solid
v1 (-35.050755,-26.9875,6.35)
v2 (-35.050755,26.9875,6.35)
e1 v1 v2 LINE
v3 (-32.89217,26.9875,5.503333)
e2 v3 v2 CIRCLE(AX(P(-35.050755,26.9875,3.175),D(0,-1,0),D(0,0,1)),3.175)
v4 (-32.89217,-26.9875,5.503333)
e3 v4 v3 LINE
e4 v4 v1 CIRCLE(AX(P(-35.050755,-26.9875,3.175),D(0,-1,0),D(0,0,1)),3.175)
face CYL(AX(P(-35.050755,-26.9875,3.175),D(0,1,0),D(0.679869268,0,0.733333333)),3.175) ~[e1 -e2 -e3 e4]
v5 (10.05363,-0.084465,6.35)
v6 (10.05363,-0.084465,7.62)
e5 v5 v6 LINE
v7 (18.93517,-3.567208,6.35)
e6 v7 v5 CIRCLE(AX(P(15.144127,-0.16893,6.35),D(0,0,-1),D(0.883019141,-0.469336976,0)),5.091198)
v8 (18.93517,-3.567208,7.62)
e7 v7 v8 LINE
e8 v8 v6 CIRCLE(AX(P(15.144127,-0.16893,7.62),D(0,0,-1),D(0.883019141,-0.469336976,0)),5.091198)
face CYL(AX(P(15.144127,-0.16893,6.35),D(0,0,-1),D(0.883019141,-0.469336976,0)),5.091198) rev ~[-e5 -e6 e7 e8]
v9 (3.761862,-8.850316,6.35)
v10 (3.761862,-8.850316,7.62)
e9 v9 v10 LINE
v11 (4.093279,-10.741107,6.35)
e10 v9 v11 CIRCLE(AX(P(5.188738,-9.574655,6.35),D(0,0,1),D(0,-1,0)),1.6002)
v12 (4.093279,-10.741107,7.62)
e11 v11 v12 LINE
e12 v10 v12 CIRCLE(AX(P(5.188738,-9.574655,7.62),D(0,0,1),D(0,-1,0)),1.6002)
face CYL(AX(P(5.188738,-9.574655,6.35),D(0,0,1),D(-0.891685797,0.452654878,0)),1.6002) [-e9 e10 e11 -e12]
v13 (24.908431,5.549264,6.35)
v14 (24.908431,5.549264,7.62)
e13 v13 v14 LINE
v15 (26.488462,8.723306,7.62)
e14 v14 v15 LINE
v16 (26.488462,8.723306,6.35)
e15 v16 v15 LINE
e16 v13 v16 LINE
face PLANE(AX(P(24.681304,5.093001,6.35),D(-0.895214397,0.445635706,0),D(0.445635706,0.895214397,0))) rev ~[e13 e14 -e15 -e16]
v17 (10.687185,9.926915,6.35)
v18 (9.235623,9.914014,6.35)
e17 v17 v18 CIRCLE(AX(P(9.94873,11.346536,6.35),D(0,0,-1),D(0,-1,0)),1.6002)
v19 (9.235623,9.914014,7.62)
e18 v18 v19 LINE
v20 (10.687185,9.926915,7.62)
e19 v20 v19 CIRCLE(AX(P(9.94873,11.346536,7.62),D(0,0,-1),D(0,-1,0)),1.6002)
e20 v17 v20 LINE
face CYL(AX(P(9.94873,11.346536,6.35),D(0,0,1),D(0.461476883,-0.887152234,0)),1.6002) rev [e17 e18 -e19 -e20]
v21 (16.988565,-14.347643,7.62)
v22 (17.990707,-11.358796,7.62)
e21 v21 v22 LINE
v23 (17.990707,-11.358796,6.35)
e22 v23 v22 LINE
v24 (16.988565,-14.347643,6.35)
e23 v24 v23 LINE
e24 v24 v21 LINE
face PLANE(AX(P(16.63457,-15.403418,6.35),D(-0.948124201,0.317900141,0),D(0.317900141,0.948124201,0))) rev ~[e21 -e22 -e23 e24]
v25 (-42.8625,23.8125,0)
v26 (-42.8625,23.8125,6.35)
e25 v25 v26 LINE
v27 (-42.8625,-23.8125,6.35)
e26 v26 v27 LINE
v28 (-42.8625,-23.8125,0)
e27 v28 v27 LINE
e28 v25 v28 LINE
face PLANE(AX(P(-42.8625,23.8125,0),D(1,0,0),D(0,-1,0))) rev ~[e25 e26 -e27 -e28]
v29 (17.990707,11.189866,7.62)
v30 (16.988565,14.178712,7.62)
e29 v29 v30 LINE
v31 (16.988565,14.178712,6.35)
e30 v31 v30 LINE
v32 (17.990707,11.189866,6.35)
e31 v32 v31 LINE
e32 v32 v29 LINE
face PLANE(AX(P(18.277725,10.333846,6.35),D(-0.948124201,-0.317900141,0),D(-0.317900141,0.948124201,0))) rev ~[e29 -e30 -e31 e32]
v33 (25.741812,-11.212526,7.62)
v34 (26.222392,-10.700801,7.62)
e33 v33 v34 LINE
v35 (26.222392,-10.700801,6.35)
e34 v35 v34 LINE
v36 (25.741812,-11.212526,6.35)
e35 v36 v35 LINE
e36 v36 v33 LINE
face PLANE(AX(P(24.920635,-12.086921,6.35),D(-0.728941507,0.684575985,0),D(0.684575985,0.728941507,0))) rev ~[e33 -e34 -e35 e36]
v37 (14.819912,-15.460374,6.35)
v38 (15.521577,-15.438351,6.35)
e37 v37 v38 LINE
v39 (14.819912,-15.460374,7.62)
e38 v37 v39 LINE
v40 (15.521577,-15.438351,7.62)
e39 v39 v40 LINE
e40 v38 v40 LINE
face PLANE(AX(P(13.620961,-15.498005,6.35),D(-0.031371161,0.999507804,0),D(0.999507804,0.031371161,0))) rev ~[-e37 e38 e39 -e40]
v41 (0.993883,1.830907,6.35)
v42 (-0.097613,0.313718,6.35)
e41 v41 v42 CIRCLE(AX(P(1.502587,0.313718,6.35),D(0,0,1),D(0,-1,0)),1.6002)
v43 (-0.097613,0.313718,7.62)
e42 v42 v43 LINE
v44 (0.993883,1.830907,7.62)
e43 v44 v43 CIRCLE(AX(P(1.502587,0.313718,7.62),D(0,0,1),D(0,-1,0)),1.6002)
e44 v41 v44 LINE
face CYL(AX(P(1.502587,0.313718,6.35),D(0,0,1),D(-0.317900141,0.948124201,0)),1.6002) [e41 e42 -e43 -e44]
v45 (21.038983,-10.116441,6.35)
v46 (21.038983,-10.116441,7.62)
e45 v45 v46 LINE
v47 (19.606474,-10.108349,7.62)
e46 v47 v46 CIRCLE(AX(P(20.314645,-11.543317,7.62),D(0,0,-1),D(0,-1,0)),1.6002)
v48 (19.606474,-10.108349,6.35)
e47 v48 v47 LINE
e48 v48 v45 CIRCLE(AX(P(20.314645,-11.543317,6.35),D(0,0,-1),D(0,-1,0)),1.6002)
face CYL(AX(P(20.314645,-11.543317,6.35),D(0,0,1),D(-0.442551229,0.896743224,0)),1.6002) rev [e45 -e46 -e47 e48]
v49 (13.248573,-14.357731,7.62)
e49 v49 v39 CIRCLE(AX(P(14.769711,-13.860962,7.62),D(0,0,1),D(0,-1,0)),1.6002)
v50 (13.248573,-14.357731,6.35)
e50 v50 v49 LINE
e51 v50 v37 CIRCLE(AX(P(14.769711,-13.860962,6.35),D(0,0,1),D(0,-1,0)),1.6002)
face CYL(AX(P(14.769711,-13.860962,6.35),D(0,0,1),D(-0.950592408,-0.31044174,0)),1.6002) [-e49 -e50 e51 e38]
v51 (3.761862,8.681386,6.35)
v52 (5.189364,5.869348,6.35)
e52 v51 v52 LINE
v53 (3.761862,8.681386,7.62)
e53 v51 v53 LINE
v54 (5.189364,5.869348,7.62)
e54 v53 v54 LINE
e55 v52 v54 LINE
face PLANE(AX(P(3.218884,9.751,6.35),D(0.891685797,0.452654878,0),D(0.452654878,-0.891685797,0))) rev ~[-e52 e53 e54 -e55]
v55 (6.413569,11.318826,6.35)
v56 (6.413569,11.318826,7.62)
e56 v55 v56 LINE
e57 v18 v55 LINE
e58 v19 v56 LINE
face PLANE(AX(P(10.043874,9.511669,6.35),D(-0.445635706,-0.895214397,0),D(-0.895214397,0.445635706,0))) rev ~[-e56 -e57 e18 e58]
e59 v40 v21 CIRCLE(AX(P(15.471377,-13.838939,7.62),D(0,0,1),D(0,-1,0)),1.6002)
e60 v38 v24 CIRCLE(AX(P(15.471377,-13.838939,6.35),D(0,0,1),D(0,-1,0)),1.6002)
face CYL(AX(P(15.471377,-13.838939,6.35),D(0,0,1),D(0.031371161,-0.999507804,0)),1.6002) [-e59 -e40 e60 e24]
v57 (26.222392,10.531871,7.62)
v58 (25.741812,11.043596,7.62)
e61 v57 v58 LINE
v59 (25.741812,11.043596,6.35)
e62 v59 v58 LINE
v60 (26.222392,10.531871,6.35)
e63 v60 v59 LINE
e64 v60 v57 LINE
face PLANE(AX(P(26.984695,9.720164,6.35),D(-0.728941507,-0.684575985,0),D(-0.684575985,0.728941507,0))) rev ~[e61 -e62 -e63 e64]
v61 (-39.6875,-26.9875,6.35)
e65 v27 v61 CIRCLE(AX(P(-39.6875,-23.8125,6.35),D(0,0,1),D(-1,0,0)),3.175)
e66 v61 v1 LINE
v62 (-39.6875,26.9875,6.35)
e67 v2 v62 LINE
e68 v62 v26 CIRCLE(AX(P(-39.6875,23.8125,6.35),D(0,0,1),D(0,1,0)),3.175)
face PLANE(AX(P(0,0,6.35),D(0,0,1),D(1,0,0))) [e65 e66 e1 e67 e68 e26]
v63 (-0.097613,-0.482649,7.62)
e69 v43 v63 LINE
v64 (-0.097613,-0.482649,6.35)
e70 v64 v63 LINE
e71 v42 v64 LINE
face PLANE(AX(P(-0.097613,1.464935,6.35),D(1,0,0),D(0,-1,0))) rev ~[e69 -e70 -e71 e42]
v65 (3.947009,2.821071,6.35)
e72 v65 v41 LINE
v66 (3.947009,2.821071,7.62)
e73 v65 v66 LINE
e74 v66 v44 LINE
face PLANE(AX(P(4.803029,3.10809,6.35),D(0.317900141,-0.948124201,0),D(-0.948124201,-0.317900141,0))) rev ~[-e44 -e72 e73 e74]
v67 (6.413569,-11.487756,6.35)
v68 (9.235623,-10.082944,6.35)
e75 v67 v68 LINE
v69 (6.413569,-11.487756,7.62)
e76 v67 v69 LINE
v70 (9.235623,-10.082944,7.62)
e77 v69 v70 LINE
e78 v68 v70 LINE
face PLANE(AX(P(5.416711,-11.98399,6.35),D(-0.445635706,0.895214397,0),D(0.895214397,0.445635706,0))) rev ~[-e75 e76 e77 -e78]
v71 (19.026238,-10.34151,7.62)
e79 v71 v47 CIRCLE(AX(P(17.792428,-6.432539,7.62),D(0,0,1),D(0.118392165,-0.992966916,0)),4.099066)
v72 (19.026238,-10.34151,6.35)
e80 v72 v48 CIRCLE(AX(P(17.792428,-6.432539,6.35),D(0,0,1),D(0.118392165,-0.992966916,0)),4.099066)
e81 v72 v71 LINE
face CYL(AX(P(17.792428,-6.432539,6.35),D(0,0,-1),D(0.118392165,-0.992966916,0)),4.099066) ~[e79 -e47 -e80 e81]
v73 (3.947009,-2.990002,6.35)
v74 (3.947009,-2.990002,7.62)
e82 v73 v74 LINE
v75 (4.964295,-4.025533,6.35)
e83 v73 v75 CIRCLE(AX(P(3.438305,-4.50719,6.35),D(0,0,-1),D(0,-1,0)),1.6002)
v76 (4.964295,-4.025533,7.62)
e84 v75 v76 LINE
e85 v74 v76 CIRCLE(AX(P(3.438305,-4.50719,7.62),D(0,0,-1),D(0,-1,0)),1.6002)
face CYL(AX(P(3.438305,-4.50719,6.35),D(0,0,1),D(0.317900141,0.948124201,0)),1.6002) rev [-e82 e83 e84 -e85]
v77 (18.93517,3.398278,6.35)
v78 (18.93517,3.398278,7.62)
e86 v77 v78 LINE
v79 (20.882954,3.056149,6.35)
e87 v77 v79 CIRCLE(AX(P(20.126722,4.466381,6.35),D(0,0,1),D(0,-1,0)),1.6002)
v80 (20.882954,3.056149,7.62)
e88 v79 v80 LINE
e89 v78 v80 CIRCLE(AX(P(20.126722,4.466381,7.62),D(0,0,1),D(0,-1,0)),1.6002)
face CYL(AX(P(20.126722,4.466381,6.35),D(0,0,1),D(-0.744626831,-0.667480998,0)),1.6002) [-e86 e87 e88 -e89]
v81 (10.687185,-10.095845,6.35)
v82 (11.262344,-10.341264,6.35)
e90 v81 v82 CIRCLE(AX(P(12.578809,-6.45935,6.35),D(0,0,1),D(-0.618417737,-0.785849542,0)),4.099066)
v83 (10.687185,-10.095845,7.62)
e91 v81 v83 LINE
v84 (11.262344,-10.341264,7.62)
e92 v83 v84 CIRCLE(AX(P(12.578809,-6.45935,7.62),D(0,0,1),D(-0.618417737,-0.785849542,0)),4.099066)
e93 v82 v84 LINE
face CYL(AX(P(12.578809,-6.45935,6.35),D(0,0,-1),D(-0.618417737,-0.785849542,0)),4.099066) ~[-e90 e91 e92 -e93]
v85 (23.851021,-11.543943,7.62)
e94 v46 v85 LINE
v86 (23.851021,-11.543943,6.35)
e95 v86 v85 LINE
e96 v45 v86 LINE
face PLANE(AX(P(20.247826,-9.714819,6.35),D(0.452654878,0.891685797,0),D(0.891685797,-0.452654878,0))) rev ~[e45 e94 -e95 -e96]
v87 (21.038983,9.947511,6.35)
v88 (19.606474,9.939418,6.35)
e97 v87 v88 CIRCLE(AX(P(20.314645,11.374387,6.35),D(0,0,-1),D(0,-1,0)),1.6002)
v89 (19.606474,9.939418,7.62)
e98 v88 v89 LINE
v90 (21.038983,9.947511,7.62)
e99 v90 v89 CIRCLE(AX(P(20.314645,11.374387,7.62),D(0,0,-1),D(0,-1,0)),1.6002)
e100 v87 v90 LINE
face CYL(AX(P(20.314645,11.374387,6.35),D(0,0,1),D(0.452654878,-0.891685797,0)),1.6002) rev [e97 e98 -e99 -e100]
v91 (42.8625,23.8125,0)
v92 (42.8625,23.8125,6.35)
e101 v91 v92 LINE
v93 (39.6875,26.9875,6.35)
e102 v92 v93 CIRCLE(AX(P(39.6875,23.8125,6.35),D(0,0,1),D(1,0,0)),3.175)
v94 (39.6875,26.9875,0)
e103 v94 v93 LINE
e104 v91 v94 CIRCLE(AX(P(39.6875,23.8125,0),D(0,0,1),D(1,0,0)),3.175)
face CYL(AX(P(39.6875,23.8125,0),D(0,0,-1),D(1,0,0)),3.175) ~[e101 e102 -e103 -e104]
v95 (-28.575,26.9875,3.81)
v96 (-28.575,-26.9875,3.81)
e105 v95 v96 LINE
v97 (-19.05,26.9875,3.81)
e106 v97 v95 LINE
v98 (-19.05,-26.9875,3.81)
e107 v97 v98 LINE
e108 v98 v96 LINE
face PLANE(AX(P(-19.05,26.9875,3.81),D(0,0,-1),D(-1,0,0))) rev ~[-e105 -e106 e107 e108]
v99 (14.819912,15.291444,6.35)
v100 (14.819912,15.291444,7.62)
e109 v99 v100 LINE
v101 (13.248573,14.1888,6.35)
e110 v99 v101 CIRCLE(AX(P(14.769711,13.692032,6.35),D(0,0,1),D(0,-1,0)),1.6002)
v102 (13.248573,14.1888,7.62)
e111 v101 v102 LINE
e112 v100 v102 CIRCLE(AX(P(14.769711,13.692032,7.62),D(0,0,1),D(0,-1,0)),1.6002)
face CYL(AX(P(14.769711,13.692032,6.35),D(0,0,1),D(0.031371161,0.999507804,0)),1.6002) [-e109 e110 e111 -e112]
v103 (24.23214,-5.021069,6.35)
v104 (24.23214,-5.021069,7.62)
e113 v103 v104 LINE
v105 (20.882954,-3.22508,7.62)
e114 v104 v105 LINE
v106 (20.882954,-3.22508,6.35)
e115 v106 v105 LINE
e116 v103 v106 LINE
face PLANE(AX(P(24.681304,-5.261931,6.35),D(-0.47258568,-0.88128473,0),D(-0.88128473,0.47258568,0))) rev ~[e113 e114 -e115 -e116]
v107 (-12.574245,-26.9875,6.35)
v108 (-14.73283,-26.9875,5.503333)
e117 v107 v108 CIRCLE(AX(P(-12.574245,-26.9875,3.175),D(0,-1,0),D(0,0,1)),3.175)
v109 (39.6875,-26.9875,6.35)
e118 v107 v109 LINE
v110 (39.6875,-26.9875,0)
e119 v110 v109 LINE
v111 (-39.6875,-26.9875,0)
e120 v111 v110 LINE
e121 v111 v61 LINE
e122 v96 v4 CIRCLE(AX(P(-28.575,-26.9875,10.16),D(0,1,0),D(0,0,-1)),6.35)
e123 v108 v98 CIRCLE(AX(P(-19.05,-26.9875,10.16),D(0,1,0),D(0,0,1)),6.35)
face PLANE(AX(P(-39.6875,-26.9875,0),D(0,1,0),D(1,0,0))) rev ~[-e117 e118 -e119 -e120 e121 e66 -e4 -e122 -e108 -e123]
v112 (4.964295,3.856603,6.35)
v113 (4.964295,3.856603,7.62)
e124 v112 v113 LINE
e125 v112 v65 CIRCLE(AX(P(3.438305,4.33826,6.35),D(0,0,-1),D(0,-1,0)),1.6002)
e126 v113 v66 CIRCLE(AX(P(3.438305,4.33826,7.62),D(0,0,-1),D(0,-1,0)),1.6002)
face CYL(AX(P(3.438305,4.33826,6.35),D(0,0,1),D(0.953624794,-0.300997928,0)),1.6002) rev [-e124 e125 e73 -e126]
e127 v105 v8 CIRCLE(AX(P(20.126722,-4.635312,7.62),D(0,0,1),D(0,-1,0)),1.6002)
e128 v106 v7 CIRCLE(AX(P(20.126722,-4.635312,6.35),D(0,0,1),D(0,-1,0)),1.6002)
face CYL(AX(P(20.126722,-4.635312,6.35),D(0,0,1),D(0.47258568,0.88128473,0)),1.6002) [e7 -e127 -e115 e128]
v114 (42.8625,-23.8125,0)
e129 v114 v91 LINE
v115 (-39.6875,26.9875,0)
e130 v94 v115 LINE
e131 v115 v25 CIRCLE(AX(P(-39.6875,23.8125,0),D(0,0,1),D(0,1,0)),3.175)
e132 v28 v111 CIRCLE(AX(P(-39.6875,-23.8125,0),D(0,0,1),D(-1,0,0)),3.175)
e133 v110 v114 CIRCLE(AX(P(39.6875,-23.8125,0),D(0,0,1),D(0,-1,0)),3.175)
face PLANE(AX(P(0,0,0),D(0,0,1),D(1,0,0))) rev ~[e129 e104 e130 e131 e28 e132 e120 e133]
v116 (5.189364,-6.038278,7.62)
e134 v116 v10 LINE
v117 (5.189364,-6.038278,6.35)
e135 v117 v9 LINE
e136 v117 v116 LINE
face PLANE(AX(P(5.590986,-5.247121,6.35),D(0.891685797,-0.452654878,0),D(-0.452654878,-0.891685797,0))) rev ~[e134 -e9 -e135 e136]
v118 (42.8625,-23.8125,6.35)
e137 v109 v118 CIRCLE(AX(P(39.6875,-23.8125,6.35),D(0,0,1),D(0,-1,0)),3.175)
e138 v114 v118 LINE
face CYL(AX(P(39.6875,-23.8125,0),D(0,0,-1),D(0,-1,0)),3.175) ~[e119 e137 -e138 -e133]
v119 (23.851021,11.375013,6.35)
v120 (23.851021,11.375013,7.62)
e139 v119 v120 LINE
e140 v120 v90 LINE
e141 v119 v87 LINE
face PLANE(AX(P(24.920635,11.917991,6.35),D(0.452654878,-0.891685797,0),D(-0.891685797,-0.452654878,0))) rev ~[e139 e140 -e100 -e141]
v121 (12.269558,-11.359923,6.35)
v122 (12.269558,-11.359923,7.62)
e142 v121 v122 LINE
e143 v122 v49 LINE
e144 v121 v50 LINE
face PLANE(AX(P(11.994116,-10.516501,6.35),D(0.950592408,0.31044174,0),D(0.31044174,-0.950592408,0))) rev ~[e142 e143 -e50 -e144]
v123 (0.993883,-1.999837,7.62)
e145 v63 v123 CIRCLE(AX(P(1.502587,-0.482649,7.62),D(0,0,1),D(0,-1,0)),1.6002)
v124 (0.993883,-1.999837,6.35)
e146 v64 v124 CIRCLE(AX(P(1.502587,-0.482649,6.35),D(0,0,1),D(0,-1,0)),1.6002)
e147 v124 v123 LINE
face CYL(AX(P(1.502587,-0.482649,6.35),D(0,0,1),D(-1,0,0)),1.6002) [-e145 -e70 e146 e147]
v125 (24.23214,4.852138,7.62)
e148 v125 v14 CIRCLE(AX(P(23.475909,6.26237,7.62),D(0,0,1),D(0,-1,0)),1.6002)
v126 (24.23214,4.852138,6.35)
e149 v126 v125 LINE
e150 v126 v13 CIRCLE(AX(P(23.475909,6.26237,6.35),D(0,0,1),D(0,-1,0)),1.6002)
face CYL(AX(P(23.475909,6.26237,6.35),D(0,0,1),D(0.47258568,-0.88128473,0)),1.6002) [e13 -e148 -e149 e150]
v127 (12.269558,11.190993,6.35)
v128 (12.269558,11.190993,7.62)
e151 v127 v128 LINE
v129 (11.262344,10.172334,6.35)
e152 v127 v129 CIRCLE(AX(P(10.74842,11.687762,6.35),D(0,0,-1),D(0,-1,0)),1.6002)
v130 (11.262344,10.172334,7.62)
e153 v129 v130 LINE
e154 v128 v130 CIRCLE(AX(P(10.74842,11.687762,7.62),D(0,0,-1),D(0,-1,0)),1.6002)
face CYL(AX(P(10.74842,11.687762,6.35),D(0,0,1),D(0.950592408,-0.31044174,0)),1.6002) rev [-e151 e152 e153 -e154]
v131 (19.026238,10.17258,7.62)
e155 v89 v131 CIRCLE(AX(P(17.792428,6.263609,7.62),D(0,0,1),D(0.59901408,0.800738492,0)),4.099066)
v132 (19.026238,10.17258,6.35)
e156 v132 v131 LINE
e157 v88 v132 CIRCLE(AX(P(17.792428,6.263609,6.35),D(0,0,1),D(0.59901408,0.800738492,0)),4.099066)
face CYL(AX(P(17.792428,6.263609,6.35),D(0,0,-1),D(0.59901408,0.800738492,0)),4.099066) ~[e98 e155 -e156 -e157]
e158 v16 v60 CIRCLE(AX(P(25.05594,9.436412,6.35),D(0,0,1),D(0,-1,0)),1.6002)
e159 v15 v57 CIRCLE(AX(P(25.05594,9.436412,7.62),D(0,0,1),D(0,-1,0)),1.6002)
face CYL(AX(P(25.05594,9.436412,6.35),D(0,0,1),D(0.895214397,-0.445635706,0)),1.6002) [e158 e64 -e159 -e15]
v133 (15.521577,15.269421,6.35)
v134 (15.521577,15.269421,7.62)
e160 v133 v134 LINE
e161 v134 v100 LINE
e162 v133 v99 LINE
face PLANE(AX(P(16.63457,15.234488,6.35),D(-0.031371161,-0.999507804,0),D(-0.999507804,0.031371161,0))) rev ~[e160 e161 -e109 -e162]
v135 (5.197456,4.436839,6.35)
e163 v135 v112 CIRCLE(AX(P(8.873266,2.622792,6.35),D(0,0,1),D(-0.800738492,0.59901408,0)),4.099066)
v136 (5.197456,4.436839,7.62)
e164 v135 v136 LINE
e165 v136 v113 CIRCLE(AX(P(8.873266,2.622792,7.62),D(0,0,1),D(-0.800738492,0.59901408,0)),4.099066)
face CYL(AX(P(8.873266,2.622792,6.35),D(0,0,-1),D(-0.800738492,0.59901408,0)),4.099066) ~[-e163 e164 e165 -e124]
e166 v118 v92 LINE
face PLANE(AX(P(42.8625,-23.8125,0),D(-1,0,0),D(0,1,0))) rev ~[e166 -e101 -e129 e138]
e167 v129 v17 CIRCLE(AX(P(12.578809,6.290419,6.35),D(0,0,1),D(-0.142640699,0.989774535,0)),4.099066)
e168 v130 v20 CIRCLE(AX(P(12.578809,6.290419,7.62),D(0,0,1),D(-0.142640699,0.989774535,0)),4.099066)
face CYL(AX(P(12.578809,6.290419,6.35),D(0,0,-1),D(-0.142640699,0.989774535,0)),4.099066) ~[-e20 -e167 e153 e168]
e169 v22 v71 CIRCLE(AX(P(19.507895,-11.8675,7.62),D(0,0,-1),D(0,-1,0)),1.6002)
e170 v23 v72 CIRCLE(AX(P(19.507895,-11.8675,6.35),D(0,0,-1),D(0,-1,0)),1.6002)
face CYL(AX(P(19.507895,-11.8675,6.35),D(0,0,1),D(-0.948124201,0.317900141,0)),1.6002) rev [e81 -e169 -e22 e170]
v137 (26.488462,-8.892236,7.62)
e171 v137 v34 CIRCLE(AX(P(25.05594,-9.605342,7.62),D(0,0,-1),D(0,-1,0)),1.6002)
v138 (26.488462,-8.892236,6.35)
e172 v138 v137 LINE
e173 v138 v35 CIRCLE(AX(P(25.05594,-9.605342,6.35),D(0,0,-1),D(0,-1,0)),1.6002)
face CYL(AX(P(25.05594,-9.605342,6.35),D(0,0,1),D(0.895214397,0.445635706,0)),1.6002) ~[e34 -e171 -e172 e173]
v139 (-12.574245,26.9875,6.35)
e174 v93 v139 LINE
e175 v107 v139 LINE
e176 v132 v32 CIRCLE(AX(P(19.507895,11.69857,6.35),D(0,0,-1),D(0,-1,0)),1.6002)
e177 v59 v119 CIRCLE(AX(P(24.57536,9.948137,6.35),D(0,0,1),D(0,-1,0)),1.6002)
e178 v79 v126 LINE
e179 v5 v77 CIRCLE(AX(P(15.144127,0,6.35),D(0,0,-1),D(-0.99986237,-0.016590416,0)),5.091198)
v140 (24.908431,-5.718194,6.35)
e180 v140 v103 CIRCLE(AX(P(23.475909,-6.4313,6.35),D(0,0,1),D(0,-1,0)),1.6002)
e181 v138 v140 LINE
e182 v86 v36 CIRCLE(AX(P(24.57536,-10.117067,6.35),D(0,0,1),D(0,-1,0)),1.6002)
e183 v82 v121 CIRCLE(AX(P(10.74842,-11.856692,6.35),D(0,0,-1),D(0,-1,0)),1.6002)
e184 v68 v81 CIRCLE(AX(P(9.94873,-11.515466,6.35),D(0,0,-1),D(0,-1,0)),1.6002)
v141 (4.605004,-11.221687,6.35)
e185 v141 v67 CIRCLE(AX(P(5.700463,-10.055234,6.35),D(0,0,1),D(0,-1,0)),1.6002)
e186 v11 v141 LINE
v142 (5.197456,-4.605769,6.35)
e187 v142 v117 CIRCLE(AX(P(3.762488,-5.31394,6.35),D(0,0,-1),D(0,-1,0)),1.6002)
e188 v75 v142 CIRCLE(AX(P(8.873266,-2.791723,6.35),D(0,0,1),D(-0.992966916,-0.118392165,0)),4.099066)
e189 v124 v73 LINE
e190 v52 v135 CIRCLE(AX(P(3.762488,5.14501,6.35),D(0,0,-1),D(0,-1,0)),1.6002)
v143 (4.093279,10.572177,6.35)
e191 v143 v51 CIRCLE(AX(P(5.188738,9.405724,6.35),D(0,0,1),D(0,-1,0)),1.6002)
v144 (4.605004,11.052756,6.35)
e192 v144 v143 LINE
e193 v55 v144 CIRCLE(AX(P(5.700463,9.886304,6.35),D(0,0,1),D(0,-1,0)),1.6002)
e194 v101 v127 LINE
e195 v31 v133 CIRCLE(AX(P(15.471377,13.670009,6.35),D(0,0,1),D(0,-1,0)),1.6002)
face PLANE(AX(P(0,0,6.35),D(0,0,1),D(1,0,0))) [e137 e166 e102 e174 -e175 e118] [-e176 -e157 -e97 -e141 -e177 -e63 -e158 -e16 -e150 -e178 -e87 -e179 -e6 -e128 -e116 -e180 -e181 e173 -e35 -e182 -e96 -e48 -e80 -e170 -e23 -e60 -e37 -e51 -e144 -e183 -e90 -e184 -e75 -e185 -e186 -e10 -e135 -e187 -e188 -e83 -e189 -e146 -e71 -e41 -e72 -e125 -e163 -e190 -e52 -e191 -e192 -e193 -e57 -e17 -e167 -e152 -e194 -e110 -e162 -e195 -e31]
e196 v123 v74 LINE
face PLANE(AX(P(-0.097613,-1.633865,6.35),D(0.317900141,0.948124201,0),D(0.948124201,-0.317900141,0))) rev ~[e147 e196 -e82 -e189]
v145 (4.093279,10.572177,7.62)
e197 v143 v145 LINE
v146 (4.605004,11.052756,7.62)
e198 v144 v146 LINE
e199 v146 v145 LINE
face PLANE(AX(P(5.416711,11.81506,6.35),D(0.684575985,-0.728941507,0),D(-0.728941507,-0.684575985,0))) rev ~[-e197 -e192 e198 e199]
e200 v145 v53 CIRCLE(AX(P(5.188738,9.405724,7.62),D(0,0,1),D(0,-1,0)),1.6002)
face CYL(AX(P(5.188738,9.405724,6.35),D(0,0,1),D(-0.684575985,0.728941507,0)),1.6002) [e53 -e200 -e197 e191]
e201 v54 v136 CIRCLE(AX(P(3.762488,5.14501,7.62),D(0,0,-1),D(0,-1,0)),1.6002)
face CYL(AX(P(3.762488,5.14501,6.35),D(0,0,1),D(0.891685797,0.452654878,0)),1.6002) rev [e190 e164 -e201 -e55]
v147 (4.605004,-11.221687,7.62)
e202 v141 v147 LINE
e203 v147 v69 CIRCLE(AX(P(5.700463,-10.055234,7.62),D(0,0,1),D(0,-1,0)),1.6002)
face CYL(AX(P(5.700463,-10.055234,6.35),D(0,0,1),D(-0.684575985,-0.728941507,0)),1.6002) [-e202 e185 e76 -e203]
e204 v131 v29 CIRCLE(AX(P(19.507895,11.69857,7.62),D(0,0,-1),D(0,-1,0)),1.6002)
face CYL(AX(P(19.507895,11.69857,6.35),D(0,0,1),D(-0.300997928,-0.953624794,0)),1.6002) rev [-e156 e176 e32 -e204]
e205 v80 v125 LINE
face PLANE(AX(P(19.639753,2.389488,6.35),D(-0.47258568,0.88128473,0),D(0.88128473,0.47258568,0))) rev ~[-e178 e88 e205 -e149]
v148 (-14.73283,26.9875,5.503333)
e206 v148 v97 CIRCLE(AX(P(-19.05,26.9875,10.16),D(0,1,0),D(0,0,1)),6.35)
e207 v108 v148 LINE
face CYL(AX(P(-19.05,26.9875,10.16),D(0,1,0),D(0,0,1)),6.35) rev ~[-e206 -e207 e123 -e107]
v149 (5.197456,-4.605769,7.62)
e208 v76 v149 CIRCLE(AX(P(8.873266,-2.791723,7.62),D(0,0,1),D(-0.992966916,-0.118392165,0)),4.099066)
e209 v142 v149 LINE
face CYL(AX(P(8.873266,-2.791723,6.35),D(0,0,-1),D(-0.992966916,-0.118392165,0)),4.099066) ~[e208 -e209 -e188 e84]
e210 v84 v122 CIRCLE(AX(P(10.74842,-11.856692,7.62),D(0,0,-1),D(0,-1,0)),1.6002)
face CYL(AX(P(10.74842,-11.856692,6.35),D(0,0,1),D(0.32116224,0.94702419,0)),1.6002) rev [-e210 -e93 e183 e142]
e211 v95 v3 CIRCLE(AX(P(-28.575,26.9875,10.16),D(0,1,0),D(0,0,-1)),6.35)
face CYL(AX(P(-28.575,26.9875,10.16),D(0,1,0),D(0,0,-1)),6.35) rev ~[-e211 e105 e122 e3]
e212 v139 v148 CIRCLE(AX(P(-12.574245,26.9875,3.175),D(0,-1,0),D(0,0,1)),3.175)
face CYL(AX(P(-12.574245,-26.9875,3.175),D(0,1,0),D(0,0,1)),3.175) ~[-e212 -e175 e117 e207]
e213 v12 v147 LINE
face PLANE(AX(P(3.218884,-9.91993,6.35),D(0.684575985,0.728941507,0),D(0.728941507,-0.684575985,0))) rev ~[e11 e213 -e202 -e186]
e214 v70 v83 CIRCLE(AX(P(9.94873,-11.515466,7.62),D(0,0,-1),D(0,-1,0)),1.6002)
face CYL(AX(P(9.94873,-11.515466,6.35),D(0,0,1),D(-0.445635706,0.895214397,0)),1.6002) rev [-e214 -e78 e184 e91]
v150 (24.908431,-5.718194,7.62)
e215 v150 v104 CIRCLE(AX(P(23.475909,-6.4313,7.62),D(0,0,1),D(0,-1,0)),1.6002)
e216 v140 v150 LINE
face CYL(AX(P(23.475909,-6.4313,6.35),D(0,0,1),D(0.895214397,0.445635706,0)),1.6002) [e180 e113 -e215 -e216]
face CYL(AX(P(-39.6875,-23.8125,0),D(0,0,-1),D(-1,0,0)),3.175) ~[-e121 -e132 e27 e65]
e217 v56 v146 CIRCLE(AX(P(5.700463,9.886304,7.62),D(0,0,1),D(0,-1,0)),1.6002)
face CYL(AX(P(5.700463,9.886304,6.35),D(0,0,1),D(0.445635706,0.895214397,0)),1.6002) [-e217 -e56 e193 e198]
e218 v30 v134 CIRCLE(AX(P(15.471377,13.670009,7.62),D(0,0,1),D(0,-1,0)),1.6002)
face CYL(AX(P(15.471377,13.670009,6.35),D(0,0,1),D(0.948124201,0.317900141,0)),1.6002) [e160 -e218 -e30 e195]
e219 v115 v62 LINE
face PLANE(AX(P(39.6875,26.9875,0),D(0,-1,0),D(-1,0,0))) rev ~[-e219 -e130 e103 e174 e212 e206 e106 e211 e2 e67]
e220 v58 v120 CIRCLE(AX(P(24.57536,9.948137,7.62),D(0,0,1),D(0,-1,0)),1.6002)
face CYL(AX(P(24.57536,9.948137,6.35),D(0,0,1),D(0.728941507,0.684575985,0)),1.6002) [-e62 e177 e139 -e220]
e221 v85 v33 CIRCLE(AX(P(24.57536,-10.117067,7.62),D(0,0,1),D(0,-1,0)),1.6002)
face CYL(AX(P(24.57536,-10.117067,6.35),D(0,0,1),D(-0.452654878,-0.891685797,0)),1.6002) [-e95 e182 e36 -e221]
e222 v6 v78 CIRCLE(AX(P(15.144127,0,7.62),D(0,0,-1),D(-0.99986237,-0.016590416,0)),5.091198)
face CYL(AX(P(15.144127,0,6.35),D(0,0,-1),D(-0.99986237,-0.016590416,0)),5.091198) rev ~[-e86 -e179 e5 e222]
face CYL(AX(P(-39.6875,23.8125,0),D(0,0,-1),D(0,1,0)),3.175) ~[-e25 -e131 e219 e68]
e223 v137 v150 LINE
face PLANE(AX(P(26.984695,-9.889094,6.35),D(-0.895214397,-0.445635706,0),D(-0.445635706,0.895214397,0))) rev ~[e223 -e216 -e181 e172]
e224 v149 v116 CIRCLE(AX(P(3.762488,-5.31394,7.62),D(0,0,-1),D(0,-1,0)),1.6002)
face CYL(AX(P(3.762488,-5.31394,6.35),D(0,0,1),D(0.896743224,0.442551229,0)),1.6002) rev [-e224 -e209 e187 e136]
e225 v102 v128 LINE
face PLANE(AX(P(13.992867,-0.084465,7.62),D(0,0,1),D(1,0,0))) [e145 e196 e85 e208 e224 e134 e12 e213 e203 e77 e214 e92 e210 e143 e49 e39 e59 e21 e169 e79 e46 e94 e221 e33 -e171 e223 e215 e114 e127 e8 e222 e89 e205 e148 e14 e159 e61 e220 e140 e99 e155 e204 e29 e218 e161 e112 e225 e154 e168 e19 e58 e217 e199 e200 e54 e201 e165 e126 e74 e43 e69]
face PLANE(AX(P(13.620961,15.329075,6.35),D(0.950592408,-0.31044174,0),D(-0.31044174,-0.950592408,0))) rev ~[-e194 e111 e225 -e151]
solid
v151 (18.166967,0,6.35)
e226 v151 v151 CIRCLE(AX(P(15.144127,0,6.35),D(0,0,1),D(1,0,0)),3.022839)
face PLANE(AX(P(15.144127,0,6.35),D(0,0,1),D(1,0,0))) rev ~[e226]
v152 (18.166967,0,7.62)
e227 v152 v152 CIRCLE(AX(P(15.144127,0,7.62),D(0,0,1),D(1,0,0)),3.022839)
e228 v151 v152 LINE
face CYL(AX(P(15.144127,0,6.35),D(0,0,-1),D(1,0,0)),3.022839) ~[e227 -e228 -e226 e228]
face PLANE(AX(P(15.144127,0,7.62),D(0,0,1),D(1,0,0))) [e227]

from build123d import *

# Parameters (mm, degrees)
F1_DEPTH = 6.35
F3_DEPTH = 76.2
F4_R     = 3.175
F6_DEPTH = 1.27
F5_R     = 3.022839237
F7_R     = 1.6002


with BuildPart() as f1:
    # F0 (on Top) → F1 (new body)
    with BuildSketch(Plane.XY):
        with BuildLine():
            Line((-39.6875, -26.9875), (39.6875, -26.9875))
            ThreePointArc((39.6875, -26.9875), (41.9325640303, -26.0575640303), (42.8625, -23.8125))
            Line((42.8625, -23.8125), (42.8625, 23.8125))
            ThreePointArc((42.8625, 23.8125), (41.9325640303, 26.0575640303), (39.6875, 26.9875))
            Line((39.6875, 26.9875), (-39.6875, 26.9875))
            ThreePointArc((-39.6875, 26.9875), (-41.9325640303, 26.0575640303), (-42.8625, 23.8125))
            Line((-42.8625, 23.8125), (-42.8625, -23.8125))
            ThreePointArc((-42.8625, -23.8125), (-41.9325640303, -26.0575640303), (-39.6875, -26.9875))
        make_face()
    extrude(amount=F1_DEPTH)

    # F2 (on face) → F3 (cut)
    with BuildSketch(Plane(origin=(0, 26.9875, 0), x_dir=(-1, 0, 0), z_dir=(0, 1, 0))):
        with BuildLine():
            ThreePointArc((19.05, 16.51), (12.7, 10.16), (19.05, 3.81))
            Line((19.05, 3.81), (28.575, 3.81))
            ThreePointArc((28.575, 3.81), (34.925, 10.16), (28.575, 16.51))
            Line((28.575, 16.51), (19.05, 16.51))
        make_face()
    extrude(amount=-F3_DEPTH, mode=Mode.SUBTRACT)

    # F4
    f4_edges = [f1.edges().sort_by_distance(p)[0] for p in [
        (-13.97, 0, 6.35),
        (-33.655, 0, 6.35),
    ]]
    fillet(f4_edges, radius=F4_R)

    # F5 (on face) → F6 (join)
    with BuildSketch(Plane.XY.offset(6.35)):
        with BuildLine():
            Line((26.9846954019, -9.8890943361), (24.6813038786, -5.2619308793))
            Line((24.6813038786, -5.2619308793), (19.6397530794, -2.5584178956))
            ThreePointArc((19.6397530794, -2.5584178956), (13.8718936075, -5.0986079783), (10.0536296353, -0.0844651021))
            ThreePointArc((10.0536296353, -0.0844651021), (13.8718936075, 4.929677774), (19.6397530794, 2.3894876914))
            Line((19.6397530794, 2.3894876914), (24.6813038786, 5.0930006751))
            Line((24.6813038786, 5.0930006751), (26.9846954019, 9.7201641319))
            Line((26.9846954019, 9.7201641319), (24.9206350104, 11.9179907053))
            Line((24.9206350104, 11.9179907053), (20.2478260164, 9.5458885687))
            ThreePointArc((20.2478260164, 9.5458885687), (19.3146437966, 10.0695514207), (18.2777250704, 10.3338455627))
            Line((18.2777250704, 10.3338455627), (16.6345701783, 15.2344879866))
            Line((16.6345701783, 15.2344879866), (13.6209610048, 15.3290749609))
            Line((13.6209610048, 15.3290749609), (11.9941155844, 10.3475705276))
            ThreePointArc((11.9941155844, 10.3475705276), (10.9639705549, 10.0579966056), (10.0438741121, 9.5116685229))
            Line((10.0438741121, 9.5116685229), (5.4167106552, 11.8150600462))
            Line((5.4167106552, 11.8150600462), (3.2188840818, 9.7509996548))
            Line((3.2188840818, 9.7509996548), (5.5909862184, 5.0781906607))
            ThreePointArc((5.5909862184, 5.0781906607), (5.0673233663, 4.1450084408), (4.8030292243, 3.1080897147))
            Line((4.8030292243, 3.1080897147), (-0.0976131995, 1.4649348226))
            Line((-0.0976131995, 1.4649348226), (-0.0976131995, -1.6338650268))
            Line((-0.0976131995, -1.6338650268), (4.8030292244, -3.2770199189))
            ThreePointArc((4.8030292244, -3.2770199189), (5.0673233664, -4.313938645), (5.5909862184, -5.2471208649))
            Line((5.5909862184, -5.2471208649), (3.2188840818, -9.919929859))
            Line((3.2188840818, -9.919929859), (5.4167106552, -11.9839902504))
            Line((5.4167106552, -11.9839902504), (10.0438741121, -9.6805987271))
            ThreePointArc((10.0438741121, -9.6805987271), (10.9639705549, -10.2269268099), (11.9941155844, -10.5165007319))
            Line((11.9941155844, -10.5165007319), (13.6209610048, -15.4980051652))
            Line((13.6209610048, -15.4980051652), (16.6345701783, -15.4034181908))
            Line((16.6345701783, -15.4034181908), (18.2777250704, -10.502775767))
            ThreePointArc((18.2777250704, -10.502775767), (19.3146437966, -10.238481625), (20.2478260164, -9.714818773))
            Line((20.2478260164, -9.714818773), (24.9206350104, -12.0869209095))
            Line((24.9206350104, -12.0869209095), (26.9846954019, -9.8890943361))
        make_face()
    extrude(amount=F6_DEPTH)

    # F7
    f7_edges = [f1.edges().sort_by_distance(p)[0] for p in [
        (3.218884, -9.91993, 6.985),
        (5.416711, -11.98399, 6.985),
        (10.043874, -9.680599, 6.985),
        (11.994116, -10.516501, 6.985),
        (13.620961, -15.498005, 6.985),
        (16.63457, -15.403418, 6.985),
        (24.920635, -12.086921, 6.985),
        (20.247826, -9.714819, 6.985),
        (18.277725, -10.502776, 6.985),
        (26.984695, -9.889094, 6.985),
        (24.681304, -5.261931, 6.985),
        (19.639753, -2.558418, 6.985),
        (19.639753, 2.389488, 6.985),
        (24.681304, 5.093001, 6.985),
        (26.984695, 9.720164, 6.985),
        (24.920635, 11.917991, 6.985),
        (20.247826, 9.545889, 6.985),
        (18.277725, 10.333846, 6.985),
        (16.63457, 15.234488, 6.985),
        (13.620961, 15.329075, 6.985),
        (11.994116, 10.347571, 6.985),
        (10.043874, 9.511669, 6.985),
        (5.416711, 11.81506, 6.985),
        (3.218884, 9.751, 6.985),
        (4.803029, 3.10809, 6.985),
        (5.590986, 5.078191, 6.985),
        (5.590986, -5.247121, 6.985),
        (4.803029, -3.27702, 6.985),
        (-0.097613, -1.633865, 6.985),
        (-0.097613, 1.464935, 6.985),
    ]]
    fillet(f7_edges, radius=F7_R)


with BuildPart() as f6:
    # F5 (on face) → F6, piece 2 (new body)
    with BuildSketch(Plane.XY.offset(6.35)):
        with Locations((15.1441273911, 0)):
            Circle(F5_R)
    extrude(amount=F6_DEPTH)


solid = Compound([f1.part, f6.part])
